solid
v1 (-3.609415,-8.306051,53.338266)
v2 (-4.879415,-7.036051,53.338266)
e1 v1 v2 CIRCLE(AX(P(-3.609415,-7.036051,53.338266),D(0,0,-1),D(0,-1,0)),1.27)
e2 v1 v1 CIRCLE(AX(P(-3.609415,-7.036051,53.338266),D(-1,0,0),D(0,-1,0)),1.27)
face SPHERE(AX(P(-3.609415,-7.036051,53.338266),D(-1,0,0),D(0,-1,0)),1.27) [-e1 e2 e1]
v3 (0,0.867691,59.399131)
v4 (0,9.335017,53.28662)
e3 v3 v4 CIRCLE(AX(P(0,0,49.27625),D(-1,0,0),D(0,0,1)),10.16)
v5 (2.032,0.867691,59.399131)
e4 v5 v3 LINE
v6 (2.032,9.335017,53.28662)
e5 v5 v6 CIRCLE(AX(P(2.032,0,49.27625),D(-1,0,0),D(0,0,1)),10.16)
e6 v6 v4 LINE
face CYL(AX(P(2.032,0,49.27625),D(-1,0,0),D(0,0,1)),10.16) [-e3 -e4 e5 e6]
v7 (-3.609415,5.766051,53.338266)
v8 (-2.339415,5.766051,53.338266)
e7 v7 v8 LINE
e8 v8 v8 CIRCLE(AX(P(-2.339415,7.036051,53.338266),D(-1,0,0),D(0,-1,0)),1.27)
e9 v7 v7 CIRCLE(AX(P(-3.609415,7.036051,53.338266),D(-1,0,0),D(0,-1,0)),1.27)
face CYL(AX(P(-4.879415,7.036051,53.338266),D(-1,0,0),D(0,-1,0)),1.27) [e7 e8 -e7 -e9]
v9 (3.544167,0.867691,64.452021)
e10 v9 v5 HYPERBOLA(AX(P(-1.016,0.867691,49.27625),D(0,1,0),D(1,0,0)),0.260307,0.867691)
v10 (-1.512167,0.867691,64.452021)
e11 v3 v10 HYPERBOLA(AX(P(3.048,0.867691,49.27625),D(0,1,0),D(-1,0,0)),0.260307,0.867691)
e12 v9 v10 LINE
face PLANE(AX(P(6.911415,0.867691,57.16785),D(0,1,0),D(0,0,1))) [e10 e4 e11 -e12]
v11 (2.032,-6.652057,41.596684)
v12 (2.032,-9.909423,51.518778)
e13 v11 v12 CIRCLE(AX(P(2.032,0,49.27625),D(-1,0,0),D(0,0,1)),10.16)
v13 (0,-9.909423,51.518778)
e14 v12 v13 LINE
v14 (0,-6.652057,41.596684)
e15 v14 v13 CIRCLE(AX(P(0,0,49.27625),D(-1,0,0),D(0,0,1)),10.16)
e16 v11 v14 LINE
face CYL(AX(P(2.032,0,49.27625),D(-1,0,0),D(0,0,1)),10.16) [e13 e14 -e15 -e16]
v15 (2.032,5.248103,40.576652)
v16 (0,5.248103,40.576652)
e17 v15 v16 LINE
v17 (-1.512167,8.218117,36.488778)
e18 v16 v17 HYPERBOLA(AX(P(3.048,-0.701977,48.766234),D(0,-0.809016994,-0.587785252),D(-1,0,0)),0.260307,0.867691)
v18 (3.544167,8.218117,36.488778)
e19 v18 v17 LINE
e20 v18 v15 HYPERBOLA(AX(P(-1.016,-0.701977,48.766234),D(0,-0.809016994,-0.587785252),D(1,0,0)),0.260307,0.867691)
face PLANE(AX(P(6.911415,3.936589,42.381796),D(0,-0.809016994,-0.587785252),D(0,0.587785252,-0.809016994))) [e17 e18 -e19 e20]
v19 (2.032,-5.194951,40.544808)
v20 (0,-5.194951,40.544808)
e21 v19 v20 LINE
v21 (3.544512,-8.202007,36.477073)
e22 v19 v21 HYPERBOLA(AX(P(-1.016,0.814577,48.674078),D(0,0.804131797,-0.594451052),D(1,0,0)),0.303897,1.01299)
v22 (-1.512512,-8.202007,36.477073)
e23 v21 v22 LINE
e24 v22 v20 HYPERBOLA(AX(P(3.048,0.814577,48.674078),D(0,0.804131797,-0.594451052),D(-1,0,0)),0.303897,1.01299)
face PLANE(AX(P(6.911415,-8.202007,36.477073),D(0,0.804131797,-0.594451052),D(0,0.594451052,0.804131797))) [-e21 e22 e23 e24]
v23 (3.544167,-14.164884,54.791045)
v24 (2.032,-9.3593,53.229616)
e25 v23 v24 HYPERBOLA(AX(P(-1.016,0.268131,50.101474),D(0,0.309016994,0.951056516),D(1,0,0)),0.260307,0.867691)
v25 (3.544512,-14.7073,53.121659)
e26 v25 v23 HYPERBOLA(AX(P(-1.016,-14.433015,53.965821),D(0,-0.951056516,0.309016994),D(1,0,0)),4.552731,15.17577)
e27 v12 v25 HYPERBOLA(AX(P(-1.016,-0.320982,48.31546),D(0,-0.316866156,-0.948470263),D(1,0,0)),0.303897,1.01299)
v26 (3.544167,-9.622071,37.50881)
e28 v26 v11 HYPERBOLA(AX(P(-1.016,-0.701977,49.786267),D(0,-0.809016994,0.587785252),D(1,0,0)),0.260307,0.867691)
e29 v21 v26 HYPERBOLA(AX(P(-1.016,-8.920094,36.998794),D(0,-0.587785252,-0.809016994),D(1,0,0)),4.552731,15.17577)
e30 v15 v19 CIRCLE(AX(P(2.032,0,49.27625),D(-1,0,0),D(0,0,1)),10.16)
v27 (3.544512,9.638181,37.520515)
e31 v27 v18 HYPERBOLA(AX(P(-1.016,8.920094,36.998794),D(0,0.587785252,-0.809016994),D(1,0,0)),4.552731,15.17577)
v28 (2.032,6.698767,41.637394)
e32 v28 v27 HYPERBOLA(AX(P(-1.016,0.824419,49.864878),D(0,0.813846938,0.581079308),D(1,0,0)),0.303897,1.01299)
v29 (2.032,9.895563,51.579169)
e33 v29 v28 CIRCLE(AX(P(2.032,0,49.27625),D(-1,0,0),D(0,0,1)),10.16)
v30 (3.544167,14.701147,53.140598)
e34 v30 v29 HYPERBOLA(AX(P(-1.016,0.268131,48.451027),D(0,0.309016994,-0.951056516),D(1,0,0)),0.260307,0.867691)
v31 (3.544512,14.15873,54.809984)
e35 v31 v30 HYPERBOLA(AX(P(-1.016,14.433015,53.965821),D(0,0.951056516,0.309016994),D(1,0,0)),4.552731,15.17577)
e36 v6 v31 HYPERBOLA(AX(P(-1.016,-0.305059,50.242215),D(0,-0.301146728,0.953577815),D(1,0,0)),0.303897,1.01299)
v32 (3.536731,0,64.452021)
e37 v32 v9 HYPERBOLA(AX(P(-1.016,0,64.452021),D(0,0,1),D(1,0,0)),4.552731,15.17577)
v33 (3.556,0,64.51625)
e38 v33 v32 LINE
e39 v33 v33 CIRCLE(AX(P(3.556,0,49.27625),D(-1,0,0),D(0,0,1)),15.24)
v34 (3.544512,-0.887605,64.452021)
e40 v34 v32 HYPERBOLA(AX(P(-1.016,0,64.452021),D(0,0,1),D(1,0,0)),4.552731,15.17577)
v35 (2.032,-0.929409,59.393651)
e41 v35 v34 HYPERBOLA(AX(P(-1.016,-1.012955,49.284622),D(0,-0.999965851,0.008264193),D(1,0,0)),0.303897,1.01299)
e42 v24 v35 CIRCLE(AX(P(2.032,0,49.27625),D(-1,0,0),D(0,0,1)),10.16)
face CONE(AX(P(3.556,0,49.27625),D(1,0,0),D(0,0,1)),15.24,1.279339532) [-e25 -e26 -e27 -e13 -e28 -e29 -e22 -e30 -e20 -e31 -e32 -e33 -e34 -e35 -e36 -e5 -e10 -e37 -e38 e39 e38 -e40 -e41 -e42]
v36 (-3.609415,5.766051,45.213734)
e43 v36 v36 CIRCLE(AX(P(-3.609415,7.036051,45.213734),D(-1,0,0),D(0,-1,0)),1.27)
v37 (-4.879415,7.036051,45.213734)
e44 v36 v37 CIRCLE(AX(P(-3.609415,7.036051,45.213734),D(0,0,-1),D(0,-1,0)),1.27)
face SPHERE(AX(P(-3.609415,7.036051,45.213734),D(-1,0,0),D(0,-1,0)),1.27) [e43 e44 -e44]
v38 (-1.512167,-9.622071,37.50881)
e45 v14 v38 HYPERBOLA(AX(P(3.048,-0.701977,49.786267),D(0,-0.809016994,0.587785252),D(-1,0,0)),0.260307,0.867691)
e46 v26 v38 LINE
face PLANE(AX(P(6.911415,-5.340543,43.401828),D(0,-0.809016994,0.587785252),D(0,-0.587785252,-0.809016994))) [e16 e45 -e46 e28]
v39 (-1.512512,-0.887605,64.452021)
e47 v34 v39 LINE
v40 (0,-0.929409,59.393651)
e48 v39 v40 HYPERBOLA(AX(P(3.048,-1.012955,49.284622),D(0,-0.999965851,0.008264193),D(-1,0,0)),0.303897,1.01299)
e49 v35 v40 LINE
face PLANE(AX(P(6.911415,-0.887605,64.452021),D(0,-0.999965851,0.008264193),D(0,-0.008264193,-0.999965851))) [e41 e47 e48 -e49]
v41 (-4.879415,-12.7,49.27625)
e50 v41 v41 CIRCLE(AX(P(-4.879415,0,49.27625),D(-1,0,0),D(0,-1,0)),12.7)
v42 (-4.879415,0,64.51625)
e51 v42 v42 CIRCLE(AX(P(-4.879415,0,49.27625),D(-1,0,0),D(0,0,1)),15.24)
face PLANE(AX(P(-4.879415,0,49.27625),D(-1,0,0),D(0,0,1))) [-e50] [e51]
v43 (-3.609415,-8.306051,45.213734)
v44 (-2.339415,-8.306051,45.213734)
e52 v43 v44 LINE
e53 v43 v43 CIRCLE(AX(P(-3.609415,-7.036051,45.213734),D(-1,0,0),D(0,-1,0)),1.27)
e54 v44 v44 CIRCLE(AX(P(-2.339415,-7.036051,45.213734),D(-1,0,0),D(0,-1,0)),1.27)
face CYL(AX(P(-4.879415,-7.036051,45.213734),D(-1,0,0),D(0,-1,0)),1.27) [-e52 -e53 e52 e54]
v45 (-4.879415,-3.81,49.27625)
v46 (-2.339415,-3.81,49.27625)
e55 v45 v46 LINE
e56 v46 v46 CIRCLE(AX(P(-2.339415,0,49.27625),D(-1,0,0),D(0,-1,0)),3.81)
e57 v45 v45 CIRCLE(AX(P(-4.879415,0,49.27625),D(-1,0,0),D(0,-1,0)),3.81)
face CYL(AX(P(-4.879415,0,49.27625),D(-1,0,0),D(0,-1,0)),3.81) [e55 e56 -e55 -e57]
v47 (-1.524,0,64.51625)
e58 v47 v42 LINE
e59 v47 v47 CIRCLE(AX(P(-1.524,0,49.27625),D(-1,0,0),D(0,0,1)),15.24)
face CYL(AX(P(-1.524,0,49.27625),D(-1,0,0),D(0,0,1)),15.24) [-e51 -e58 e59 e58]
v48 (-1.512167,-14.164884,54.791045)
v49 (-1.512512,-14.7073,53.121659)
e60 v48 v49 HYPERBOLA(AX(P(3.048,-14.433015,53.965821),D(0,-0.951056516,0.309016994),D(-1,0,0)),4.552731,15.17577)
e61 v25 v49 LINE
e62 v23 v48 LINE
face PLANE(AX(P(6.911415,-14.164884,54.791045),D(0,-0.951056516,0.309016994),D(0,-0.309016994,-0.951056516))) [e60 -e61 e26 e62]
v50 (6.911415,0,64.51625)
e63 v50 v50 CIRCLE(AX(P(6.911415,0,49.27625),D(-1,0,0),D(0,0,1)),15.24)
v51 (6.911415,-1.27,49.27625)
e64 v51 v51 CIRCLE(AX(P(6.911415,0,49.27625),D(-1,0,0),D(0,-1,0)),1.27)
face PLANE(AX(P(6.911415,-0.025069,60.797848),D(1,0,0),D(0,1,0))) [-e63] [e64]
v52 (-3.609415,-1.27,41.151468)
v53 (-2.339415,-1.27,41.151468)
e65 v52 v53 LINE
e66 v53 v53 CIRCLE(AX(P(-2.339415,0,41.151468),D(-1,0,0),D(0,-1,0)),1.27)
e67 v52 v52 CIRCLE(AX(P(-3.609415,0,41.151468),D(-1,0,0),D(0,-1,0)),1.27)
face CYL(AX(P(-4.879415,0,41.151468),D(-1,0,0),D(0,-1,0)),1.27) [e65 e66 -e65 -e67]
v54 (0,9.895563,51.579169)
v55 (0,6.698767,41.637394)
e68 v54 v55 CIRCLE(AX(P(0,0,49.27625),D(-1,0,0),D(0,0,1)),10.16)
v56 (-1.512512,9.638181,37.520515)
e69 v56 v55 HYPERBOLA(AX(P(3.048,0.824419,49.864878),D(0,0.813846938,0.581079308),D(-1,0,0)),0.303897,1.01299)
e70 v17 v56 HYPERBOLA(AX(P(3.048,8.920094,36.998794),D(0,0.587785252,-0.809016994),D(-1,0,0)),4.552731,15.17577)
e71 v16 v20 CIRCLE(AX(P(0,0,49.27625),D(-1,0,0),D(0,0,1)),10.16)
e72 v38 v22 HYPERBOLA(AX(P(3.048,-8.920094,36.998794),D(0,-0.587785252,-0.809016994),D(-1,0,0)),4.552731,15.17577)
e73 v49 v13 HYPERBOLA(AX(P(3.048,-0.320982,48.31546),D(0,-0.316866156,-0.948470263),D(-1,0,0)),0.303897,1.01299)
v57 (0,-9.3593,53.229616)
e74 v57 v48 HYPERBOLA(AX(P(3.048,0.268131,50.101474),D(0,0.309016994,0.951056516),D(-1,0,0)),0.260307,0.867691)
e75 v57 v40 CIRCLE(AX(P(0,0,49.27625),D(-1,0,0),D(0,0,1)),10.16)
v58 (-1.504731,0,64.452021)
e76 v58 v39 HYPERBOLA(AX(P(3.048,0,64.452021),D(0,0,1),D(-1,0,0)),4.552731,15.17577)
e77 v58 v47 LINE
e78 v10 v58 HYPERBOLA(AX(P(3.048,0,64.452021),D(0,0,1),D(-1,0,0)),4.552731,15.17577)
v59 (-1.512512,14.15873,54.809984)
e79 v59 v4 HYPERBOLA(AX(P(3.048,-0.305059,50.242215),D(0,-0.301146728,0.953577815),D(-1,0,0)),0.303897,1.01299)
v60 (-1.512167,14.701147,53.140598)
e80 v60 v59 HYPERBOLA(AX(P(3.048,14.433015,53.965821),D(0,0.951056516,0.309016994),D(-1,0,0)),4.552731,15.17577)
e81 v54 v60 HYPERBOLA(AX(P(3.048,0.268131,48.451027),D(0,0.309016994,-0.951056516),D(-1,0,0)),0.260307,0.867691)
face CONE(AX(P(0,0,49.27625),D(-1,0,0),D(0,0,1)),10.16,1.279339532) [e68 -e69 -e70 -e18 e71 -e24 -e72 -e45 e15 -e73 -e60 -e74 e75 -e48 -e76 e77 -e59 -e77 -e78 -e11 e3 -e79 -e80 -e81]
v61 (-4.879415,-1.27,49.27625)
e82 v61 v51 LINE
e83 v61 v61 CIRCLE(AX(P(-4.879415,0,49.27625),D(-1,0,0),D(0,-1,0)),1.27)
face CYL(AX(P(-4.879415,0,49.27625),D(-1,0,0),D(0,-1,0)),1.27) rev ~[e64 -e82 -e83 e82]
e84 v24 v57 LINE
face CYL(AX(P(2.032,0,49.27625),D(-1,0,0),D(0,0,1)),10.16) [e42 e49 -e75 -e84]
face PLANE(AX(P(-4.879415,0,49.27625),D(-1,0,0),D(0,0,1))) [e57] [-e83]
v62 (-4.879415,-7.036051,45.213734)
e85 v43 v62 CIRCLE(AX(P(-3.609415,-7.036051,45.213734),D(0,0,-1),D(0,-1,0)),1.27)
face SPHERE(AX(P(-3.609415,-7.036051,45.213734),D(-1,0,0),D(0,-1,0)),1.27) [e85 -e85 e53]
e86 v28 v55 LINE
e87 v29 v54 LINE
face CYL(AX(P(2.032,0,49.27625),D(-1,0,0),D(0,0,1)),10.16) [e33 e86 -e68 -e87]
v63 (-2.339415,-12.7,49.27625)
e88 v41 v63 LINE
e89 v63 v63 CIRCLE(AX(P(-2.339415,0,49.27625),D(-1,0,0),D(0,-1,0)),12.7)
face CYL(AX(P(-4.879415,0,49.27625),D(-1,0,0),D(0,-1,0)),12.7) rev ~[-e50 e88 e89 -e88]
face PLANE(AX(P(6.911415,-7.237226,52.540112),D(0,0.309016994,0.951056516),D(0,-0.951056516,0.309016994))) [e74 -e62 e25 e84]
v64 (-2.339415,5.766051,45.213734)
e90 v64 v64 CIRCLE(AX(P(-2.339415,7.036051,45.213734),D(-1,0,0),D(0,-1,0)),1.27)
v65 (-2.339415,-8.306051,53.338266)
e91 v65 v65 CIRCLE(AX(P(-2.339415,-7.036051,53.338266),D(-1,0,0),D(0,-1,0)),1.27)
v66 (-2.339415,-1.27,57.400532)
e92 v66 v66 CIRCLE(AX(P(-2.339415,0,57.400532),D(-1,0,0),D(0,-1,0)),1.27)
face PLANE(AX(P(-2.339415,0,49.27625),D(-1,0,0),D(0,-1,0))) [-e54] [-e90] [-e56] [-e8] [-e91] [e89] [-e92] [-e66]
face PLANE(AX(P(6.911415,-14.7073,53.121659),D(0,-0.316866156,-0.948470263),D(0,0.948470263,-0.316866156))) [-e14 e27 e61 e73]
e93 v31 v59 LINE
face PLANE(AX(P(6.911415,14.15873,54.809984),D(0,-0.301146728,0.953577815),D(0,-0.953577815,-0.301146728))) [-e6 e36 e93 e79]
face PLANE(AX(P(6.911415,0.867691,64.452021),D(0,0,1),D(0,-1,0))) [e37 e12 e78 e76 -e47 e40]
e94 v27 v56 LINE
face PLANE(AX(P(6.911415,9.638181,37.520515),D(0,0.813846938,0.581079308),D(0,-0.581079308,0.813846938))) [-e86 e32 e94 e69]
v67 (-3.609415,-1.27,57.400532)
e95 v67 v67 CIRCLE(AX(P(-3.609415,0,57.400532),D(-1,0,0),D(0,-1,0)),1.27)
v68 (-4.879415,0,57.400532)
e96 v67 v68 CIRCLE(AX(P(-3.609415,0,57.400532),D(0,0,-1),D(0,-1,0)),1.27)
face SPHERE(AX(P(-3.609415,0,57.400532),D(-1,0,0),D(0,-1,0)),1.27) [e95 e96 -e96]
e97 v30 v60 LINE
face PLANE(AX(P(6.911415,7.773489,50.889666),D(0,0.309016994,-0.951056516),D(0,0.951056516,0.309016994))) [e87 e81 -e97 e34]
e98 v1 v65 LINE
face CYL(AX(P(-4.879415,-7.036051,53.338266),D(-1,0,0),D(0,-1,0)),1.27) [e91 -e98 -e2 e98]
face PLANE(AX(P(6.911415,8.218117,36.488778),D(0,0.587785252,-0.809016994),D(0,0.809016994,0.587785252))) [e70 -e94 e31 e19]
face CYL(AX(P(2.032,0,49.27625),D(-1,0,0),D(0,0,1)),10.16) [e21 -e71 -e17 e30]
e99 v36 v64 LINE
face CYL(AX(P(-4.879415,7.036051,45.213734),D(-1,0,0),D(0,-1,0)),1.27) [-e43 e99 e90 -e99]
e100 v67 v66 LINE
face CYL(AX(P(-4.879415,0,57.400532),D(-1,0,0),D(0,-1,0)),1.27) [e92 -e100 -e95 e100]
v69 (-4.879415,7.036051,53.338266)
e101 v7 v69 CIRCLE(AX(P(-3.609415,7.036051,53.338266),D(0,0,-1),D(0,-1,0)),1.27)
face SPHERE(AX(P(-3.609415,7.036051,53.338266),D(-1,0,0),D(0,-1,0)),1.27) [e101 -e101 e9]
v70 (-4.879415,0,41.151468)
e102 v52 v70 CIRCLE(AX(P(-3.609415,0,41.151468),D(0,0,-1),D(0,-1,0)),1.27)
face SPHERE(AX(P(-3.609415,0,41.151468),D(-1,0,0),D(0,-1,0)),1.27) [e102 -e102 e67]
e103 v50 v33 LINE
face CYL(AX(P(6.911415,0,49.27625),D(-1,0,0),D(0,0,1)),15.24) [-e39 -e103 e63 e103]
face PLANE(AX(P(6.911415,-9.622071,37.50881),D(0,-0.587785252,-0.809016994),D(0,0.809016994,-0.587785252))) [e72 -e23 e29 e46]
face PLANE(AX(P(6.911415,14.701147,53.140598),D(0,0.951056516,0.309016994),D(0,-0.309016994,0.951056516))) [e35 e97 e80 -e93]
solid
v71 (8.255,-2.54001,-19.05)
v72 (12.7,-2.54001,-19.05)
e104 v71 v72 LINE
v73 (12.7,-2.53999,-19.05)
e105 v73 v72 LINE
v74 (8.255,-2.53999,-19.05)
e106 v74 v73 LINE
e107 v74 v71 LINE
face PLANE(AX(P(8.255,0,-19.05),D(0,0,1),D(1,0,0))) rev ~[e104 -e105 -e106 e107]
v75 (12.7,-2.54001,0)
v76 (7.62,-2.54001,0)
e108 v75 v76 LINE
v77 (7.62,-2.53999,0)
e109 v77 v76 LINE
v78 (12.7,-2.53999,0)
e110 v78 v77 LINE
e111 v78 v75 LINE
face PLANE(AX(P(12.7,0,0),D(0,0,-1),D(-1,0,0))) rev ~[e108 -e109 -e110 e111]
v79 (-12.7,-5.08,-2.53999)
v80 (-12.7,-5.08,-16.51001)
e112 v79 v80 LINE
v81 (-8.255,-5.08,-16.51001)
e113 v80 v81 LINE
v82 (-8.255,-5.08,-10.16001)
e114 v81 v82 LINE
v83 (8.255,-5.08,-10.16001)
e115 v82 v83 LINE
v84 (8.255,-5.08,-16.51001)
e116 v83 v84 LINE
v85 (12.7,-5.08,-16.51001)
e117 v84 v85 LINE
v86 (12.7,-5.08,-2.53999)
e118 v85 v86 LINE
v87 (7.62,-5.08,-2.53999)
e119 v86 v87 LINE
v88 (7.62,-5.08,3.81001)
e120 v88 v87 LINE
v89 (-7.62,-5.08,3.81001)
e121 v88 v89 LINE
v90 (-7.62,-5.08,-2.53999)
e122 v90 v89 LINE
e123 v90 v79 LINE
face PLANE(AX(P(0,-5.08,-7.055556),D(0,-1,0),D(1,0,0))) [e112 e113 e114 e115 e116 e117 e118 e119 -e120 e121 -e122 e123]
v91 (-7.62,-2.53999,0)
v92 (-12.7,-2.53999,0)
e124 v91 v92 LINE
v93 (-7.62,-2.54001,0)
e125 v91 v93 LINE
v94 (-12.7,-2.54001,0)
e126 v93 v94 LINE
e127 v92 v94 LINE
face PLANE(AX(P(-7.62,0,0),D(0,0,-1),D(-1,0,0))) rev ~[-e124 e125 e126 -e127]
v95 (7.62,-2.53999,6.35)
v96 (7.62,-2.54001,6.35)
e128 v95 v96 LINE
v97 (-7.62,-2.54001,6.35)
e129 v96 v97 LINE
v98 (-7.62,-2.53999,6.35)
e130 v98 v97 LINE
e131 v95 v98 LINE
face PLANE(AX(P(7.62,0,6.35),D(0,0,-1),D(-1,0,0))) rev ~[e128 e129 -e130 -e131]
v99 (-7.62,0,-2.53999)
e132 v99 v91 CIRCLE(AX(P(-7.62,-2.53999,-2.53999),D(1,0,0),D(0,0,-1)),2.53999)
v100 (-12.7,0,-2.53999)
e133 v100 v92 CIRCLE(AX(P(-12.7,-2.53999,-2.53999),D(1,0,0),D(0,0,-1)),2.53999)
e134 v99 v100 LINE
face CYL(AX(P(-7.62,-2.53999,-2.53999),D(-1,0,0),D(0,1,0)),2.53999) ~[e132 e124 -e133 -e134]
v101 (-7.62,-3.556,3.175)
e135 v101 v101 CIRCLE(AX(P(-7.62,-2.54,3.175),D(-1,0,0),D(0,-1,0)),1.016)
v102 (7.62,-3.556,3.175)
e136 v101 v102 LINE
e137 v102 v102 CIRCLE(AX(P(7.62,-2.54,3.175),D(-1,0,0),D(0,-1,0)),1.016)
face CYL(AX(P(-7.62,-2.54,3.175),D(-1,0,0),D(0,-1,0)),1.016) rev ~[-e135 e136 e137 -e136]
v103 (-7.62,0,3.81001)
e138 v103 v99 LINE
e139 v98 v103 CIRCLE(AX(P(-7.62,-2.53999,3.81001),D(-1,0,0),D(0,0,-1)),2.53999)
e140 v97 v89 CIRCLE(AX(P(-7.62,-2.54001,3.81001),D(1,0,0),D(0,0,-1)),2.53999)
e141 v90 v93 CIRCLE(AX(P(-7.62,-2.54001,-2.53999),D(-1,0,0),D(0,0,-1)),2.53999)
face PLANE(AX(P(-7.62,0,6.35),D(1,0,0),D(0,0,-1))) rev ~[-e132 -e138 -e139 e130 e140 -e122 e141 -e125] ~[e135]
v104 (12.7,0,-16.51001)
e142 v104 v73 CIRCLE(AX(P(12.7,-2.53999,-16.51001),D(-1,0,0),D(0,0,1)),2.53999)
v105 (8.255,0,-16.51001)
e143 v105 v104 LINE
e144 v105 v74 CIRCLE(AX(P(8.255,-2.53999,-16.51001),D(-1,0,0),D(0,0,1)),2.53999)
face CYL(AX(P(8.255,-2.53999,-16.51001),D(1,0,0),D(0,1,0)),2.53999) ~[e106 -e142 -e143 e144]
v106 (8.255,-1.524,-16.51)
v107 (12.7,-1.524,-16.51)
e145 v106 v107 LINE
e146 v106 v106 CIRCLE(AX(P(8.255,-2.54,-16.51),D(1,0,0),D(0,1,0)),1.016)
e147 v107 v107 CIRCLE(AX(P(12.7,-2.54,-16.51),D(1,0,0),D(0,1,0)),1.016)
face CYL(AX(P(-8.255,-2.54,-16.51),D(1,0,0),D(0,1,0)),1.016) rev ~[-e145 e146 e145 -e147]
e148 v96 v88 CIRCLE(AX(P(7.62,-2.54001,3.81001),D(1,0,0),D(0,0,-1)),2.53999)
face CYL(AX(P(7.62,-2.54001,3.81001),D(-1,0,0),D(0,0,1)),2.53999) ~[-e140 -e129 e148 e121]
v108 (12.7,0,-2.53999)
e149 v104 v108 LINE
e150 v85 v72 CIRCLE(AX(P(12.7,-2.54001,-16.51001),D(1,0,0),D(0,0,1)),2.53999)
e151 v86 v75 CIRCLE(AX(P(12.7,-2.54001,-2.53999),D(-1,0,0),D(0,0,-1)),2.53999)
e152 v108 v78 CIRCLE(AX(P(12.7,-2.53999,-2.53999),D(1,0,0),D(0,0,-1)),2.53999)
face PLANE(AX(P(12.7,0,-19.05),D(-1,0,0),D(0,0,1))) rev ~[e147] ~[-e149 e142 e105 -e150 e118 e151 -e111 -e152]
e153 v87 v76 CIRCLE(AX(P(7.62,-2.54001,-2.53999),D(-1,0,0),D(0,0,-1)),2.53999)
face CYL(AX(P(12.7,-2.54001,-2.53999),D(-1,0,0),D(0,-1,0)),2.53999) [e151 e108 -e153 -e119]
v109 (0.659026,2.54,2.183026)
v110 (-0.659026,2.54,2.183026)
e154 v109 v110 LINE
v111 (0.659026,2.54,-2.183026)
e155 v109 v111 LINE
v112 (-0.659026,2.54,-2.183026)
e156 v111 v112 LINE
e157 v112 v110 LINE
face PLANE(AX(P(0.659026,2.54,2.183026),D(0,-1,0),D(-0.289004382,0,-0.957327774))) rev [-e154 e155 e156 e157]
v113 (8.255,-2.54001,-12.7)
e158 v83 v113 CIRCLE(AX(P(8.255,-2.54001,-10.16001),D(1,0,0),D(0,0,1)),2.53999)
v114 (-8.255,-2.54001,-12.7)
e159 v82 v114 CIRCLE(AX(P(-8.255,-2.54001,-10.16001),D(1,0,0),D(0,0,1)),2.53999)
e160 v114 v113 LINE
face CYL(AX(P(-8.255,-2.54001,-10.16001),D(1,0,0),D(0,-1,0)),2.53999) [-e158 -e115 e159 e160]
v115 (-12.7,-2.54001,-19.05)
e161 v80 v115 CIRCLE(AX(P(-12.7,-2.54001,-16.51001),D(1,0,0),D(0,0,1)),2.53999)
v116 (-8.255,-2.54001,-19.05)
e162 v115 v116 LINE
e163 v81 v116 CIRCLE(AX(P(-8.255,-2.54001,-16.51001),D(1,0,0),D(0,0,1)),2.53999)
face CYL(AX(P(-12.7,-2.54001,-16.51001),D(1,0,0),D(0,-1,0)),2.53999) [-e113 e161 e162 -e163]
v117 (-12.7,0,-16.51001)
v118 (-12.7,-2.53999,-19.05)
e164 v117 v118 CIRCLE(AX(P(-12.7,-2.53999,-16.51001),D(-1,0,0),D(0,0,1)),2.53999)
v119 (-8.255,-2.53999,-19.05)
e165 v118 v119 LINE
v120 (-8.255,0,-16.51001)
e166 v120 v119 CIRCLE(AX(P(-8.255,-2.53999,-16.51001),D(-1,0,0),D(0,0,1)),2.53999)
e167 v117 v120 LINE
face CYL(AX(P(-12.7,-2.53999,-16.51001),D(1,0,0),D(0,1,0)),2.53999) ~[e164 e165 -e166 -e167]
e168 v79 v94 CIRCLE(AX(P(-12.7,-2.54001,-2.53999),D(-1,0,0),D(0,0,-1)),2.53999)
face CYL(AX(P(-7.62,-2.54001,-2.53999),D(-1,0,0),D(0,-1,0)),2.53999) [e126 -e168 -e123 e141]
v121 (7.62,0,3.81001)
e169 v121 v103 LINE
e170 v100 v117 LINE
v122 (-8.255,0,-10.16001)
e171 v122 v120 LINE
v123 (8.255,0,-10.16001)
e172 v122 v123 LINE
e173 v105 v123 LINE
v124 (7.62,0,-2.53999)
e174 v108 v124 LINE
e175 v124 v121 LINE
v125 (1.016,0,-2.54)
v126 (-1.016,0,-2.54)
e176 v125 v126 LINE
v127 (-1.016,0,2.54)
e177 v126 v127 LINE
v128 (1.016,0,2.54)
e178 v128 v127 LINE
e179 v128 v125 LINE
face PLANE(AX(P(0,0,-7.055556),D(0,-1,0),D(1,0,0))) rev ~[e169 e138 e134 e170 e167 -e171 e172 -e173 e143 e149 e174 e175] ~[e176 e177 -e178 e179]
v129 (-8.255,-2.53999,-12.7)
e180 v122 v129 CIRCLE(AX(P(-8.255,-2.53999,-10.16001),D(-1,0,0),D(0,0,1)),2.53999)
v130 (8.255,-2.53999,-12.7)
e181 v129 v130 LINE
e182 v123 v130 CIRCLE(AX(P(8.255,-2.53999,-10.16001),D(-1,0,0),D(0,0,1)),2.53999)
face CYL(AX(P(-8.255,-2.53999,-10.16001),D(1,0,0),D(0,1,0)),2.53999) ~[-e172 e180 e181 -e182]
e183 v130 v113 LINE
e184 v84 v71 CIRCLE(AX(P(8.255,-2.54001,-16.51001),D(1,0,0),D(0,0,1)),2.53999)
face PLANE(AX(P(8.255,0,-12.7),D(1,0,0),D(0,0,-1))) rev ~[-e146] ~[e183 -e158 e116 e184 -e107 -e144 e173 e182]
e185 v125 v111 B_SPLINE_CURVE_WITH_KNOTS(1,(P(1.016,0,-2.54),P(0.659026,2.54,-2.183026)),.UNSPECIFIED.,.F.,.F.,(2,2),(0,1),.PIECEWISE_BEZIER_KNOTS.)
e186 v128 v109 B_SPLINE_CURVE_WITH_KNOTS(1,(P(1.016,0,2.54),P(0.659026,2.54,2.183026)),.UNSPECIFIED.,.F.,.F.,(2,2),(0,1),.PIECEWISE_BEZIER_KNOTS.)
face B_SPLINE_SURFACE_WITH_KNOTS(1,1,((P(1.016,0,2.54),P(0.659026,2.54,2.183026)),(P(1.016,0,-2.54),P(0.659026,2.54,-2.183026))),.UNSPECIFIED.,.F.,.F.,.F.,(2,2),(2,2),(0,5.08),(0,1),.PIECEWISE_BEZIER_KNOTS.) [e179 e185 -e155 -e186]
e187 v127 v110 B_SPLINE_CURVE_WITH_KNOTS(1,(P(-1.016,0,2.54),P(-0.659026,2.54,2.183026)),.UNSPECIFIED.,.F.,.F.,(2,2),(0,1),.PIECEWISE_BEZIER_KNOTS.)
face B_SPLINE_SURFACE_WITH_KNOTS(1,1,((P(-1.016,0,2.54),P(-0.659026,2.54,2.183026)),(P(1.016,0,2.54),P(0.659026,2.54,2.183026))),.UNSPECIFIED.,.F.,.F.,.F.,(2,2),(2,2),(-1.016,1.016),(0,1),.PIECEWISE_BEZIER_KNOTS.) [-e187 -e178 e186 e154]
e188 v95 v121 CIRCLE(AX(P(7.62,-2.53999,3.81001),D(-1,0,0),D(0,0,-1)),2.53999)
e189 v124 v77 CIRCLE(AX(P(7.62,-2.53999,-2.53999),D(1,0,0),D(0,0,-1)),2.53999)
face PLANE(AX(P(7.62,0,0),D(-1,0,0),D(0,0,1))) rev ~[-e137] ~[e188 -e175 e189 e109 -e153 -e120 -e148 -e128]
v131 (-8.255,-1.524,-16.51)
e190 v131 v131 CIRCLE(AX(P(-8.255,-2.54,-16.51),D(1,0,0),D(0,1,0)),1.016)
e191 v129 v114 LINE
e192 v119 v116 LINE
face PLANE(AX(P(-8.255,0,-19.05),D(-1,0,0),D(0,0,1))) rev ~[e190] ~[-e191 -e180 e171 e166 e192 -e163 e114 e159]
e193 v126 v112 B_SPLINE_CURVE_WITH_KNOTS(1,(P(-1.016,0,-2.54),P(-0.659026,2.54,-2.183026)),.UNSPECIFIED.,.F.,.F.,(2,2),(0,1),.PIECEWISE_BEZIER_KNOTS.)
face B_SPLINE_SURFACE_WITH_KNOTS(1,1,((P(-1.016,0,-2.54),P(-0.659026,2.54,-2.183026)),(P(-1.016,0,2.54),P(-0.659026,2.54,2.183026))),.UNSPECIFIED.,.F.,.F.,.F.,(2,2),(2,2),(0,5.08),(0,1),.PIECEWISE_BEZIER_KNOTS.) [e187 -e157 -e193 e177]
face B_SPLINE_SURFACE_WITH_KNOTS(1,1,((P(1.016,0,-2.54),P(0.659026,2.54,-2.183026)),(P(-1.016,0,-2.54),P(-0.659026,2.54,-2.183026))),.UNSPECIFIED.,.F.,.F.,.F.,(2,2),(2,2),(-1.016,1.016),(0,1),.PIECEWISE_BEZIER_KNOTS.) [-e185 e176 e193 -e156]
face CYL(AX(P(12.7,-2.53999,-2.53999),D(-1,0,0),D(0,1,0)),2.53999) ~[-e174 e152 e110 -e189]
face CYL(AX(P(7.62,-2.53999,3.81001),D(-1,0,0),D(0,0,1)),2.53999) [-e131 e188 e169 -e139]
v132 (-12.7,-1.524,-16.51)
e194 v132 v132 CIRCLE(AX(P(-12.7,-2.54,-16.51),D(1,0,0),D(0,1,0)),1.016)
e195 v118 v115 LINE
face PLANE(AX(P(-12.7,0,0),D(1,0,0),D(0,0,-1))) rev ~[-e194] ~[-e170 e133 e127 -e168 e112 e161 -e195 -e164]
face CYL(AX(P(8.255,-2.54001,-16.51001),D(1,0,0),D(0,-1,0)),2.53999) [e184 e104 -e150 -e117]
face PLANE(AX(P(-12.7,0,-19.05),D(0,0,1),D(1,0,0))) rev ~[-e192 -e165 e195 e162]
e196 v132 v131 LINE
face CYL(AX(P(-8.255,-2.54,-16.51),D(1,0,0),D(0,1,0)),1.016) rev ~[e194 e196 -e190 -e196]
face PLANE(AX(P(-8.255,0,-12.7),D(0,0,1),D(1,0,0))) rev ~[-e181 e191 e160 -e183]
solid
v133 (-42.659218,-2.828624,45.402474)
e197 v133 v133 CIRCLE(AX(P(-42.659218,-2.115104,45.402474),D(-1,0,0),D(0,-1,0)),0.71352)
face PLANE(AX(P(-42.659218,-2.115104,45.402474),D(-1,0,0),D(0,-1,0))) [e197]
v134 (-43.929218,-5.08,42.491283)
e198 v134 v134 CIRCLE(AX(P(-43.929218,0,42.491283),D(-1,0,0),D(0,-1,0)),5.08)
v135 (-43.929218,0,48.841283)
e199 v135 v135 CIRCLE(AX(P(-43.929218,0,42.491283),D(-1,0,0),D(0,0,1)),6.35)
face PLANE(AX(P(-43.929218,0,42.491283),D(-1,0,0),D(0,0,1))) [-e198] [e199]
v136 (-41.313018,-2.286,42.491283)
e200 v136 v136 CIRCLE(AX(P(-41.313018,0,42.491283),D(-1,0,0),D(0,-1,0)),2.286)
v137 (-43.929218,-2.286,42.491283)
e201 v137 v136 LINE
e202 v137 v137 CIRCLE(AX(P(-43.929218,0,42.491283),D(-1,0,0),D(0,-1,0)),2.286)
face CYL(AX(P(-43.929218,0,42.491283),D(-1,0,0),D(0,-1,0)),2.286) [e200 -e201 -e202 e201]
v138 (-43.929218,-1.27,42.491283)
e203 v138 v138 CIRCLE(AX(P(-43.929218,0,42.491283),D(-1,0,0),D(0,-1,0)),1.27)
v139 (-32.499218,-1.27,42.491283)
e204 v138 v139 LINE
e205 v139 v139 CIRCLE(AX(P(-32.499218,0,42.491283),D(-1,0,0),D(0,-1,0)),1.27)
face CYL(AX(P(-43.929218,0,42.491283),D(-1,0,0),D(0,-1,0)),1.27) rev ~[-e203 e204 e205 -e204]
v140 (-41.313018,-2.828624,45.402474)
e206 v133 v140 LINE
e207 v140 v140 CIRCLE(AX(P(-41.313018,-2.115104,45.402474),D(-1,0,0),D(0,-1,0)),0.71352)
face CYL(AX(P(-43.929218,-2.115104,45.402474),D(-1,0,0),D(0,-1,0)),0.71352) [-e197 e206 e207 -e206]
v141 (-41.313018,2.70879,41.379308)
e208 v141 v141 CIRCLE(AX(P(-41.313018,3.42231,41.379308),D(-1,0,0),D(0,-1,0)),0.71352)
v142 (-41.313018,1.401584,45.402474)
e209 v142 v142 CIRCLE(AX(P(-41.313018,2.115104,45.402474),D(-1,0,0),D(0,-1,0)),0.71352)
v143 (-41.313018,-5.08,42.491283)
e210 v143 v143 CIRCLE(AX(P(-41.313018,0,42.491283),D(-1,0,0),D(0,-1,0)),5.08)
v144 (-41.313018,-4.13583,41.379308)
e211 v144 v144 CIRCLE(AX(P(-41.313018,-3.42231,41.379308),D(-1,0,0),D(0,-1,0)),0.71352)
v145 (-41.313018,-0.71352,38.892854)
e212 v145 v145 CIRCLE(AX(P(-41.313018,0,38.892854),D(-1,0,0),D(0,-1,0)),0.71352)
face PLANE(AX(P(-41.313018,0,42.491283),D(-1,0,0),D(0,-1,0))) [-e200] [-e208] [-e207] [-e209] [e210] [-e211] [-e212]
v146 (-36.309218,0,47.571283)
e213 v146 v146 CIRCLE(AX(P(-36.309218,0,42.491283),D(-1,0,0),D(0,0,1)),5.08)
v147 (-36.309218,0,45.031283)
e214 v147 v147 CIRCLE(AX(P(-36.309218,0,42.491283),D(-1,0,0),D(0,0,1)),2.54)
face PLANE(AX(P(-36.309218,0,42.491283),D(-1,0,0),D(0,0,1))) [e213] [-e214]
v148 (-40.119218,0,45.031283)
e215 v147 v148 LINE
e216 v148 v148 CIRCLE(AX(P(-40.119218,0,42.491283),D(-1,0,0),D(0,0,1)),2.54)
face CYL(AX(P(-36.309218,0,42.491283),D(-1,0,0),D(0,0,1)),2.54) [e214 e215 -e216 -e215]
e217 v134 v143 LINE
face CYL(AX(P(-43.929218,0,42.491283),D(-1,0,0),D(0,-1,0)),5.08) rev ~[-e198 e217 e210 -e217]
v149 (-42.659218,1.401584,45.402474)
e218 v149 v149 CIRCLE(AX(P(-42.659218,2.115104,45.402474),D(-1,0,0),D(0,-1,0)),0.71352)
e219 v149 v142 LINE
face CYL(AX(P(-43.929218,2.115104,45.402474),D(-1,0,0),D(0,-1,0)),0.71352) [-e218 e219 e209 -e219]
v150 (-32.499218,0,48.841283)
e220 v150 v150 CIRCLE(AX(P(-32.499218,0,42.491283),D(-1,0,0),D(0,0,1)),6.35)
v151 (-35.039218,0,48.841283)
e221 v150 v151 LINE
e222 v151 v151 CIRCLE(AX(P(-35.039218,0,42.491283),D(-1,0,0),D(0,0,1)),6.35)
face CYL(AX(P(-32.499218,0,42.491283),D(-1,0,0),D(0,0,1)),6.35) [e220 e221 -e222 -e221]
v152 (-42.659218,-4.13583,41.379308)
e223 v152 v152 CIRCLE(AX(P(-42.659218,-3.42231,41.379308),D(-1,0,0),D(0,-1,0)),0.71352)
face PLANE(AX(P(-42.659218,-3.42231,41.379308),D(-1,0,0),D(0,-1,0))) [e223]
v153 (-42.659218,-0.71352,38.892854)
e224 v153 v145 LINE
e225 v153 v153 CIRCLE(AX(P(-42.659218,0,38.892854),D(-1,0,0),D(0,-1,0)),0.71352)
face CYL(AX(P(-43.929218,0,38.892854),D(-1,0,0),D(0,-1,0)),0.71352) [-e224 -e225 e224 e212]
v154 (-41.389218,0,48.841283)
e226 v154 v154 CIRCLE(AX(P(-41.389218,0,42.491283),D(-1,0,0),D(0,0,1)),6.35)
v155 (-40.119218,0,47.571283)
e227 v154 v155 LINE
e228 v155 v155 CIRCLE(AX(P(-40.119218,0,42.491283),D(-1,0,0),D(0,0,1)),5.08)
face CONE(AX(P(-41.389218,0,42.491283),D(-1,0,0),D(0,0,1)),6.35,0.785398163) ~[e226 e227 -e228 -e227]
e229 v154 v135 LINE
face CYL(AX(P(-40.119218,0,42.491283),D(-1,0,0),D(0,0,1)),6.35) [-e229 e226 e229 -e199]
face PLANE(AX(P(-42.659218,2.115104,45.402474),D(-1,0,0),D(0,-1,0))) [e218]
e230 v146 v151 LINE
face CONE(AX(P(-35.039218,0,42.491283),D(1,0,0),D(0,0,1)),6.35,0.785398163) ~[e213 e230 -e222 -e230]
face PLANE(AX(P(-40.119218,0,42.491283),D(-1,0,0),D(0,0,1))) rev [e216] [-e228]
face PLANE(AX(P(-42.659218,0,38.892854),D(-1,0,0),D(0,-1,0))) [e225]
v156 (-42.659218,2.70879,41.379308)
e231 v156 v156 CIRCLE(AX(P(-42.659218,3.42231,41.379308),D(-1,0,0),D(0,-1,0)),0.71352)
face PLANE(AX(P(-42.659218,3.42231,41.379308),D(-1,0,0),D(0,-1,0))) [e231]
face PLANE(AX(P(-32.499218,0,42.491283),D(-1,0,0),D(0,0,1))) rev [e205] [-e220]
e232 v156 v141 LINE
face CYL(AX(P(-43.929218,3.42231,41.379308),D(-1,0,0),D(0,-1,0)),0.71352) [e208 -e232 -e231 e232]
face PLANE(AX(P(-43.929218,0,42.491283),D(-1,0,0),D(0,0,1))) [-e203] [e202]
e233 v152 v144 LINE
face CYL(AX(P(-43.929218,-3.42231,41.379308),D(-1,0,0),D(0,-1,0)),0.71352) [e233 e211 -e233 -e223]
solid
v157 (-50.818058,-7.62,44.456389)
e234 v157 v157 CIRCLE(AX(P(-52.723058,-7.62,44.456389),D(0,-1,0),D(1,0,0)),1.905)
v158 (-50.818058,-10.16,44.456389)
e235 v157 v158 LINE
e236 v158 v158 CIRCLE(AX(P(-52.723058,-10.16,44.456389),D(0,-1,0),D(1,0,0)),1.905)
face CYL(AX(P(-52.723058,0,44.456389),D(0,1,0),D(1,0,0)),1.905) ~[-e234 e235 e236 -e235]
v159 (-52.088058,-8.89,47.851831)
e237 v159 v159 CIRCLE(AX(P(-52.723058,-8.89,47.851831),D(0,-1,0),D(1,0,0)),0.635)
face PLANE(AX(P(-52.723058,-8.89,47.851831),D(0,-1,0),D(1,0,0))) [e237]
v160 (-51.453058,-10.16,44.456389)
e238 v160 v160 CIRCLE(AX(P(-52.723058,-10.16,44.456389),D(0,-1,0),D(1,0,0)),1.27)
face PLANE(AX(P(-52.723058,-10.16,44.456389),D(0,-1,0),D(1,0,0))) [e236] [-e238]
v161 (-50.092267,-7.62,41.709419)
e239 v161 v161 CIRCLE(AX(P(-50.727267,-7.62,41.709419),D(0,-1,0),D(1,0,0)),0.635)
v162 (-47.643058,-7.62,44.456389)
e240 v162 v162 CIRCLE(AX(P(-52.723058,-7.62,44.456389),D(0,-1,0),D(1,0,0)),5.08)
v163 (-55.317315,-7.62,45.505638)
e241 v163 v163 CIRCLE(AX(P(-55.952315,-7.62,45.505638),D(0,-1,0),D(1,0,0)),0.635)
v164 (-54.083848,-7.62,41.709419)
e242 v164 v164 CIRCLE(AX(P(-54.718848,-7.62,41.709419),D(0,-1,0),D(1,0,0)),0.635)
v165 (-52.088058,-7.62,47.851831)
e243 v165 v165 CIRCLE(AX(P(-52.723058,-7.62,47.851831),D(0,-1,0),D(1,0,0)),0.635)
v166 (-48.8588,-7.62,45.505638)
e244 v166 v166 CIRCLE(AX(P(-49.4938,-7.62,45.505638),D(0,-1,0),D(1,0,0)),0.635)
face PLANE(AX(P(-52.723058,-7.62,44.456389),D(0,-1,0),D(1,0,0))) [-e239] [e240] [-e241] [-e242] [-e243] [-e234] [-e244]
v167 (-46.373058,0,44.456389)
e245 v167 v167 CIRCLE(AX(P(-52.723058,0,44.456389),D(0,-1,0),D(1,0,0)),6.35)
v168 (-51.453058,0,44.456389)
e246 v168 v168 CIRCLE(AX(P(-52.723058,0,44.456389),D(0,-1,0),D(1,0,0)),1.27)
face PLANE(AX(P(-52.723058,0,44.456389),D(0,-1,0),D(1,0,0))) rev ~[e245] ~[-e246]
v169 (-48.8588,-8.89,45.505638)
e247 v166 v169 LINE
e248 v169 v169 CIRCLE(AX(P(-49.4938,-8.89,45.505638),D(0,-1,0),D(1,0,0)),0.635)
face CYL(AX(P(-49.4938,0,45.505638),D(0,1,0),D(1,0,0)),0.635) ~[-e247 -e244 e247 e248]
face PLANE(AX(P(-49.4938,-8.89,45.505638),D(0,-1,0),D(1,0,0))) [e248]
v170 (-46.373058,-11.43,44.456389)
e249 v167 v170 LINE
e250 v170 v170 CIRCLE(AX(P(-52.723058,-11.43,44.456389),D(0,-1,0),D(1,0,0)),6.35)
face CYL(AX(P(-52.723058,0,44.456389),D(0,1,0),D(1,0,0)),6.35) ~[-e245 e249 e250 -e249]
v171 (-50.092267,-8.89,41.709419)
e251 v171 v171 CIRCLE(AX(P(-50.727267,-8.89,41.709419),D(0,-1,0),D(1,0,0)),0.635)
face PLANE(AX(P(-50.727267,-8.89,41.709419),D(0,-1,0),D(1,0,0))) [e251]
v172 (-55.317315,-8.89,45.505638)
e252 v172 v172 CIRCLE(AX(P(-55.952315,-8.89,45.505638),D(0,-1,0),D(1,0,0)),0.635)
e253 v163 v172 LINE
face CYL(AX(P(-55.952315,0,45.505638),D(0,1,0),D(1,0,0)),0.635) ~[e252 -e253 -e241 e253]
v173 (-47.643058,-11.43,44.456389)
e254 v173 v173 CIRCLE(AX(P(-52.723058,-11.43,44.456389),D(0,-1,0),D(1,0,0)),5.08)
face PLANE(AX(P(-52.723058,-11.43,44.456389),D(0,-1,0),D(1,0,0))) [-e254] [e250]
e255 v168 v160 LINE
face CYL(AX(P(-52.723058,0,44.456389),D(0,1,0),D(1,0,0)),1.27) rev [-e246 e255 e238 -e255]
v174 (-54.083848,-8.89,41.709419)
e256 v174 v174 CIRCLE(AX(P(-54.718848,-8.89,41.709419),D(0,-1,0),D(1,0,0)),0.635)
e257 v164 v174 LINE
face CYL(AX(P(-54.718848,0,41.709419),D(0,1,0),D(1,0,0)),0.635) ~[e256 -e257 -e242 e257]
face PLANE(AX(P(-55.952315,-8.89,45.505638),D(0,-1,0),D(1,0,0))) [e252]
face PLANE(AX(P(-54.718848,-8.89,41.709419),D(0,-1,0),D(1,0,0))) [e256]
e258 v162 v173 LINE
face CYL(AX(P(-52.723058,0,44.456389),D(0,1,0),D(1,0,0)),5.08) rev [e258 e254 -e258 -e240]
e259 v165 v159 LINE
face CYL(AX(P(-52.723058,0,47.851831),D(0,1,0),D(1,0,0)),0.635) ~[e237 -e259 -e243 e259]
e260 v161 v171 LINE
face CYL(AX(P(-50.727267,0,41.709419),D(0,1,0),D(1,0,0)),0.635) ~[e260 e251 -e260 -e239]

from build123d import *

# Parameters (mm, degrees)
F1_DEPTH  = 5.08
F2_R      = 1.016
F3_DEPTH  = 25.4
F4_R      = 2.53999
F5_R      = 1.016
F6_DEPTH  = 25.4
F8_W      = 2.032
F8_H      = 3.6169881774
F8_H_2    = 1.4630118226
F9_DEPTH  = 2.54
F9_TAPER  = 8
F12_R     = 12.7
F12_R_2   = 3.81
F13_DEPTH = 2.54
F12_R_3   = 1.27
F14_DEPTH = 25.4
F15_R     = 1.27
F16_DEPTH = 2.54
F17_R     = 1.27
F19_DEPTH = 8.89
F20_R     = 6.35
F20_R_2   = 5.08
F21_DEPTH = 11.43
F20_R_3   = 0.635
F20_R_4   = 1.905
F22_DEPTH = 7.62
F23_DEPTH = 8.89
F20_R_5   = 1.27
F24_DEPTH = 10.16
F27_R     = 5.08
F27_R_2   = 0.7135199612
F27_R_3   = 2.286
F28_DEPTH = 2.6162
F27_R_4   = 1.27
F29_DEPTH = 25.4
F30_DEPTH = 1.27
F31_SIZE  = 1.27


# Not quite as in the source:
# - a fillet or chamfer is up to 0.001 mm smaller than in the source, because OpenCascade refuses the exact size


with BuildPart() as f1:
    # F0 (on Front) → F1 (new body)
    with BuildSketch(Plane.XZ):
        Polygon((7.62, 6.35), (0, 6.35), (-7.62, 6.35), (-7.62, 0), (-12.7, 0), (-12.7, -19.05), (-8.255, -19.05), (-8.255, -12.7), (0, -12.7), (8.255, -12.7), (8.255, -19.05), (12.7, -19.05), (12.7, 0), (7.62, 0), align=None)
    extrude(amount=F1_DEPTH)

    # F2 (on face) → F3 (cut)
    with BuildSketch(Plane(origin=(-7.62, 0, 0), x_dir=(0, -1, 0), z_dir=(-1, 0, 0))):
        with Locations((2.54, 3.175)):
            Circle(F2_R)
    extrude(amount=-F3_DEPTH, mode=Mode.SUBTRACT)

    # F4 (radius 2.54 in the source; OpenCascade refuses exactly that, so slightly less here)
    f4_edges = [f1.edges().sort_by_distance(p)[0] for p in [
        (0, -5.08, 6.35),
        (0, 0, 6.35),
        (-10.16, -5.08, 0),
        (-10.16, 0, 0),
        (10.16, -5.08, 0),
        (10.16, 0, 0),
        (10.4775, -5.08, -19.05),
        (10.4775, 0, -19.05),
        (-10.4775, 0, -19.05),
        (-10.4775, -5.08, -19.05),
        (0, -5.08, -12.7),
        (0, 0, -12.7),
    ]]
    fillet(f4_edges, radius=F4_R)

    # F5 (on face) → F6 (cut, symmetric)
    with BuildSketch(Plane.YZ.offset(-8.255)):
        with Locations((-2.54, -16.51)):
            Circle(F5_R)
    extrude(amount=F6_DEPTH, both=True, mode=Mode.SUBTRACT)

    # F8 (on face) → F9 (join)
    with BuildSketch(Plane(origin=(0, 0, 0), x_dir=(-1, 0, 0), z_dir=(0, 1, 0))):
        with Locations((0, 0.7315059113)):
            Rectangle(F8_W, F8_H)
        with Locations((0, -1.8084940887)):
            Rectangle(F8_W, F8_H_2)
    extrude(amount=F9_DEPTH, taper=F9_TAPER)


with BuildPart() as f11:
    # F10 (on Front) → F11 (revolve)
    with BuildSketch(Plane.XZ):
        Polygon((-4.8794146568, 64.516250478), (-4.8794146568, 49.276250478), (6.9114146568, 49.276250478), (6.9114146568, 64.516250478), (3.556, 64.516250478), (2.032, 59.436250478), (0, 59.436250478), (-1.524, 64.516250478), align=None)
    revolve(axis=Axis((1.016, 0, 49.276250478), (-1, 0, 0)))

    # F12 (on face) → F13 (cut)
    with BuildSketch(Plane(origin=(-4.8794146568, 0, 0), x_dir=(0, -1, 0), z_dir=(-1, 0, 0))):
        with Locations((0, 49.276250478)):
            Circle(F12_R)
        with Locations((0, 49.276250478)):
            Circle(F12_R_2, mode=Mode.SUBTRACT)
    extrude(amount=-F13_DEPTH, mode=Mode.SUBTRACT)

    # F12 (on face) → F14 (cut)
    with BuildSketch(Plane(origin=(-4.8794146568, 0, 0), x_dir=(0, -1, 0), z_dir=(-1, 0, 0))):
        with Locations((0, 49.276250478)):
            Circle(F12_R_3)
    extrude(amount=-F14_DEPTH, mode=Mode.SUBTRACT)

    # F15 (on face) → F16 (join)
    with BuildSketch(Plane(origin=(-4.8794146568, 0, 0), x_dir=(0, -1, 0), z_dir=(-1, 0, 0))):
        with Locations((-7.0360511637, 53.3382660334)):
            Circle(F15_R)
        with Locations((0, 57.4005320668)):
            Circle(F15_R)
        with Locations((7.0360511637, 53.3382660334)):
            Circle(F15_R)
        with Locations((-7.0360511637, 45.2137339666)):
            Circle(F15_R)
        with Locations((0, 41.1514679332)):
            Circle(F15_R)
        with Locations((7.0360511637, 45.2137339666)):
            Circle(F15_R)
    extrude(amount=-F16_DEPTH)

    # F17
    f17_edges = [f11.edges().sort_by_distance(p)[0] for p in [
        (-4.879415, 8.306051, 53.338266),
        (-4.879415, 8.306051, 45.213734),
        (-4.879415, 1.27, 41.151468),
        (-4.879415, -5.766051, 45.213734),
        (-4.879415, -5.766051, 53.338266),
        (-4.879415, 1.27, 57.400532),
    ]]
    fillet(f17_edges, radius=F17_R)

    # F18 (on face) → F19 (join)
    with BuildSketch(Plane.YZ.offset(6.9114146568)):
        Polygon((0.8676911239, 64.4520207786), (-0.887604639, 64.4520207786), (-0.9478044813, 57.1678504348), (0.8676911239, 57.1678504348), align=None)
        Polygon((-14.164883931, 54.7910447011), (-14.7073001519, 53.1216592278), (-7.7982452549, 50.8134733494), (-7.2372262597, 52.540112275), align=None)
        Polygon((-9.6220708399, 37.5088104483), (-8.2020067376, 36.4770734854), (-3.8717761389, 42.3347065041), (-5.3405429366, 43.4018280464), align=None)
        Polygon((8.2181171098, 36.488778356), (9.6381812121, 37.5205153188), (5.4053560043, 43.4489174963), (3.9365892065, 42.3817959541), align=None)
        Polygon((14.7011465373, 53.1405981062), (14.1587303164, 54.8099835795), (7.2124698708, 52.6163046055), (7.773488866, 50.88966568), align=None)
    extrude(amount=-F19_DEPTH)


with BuildPart() as f21:
    # F20 (on Front) → F21 (new body)
    with BuildSketch(Plane.XZ):
        with Locations((-52.7230575681, 44.4563888013)):
            Circle(F20_R)
        with Locations((-52.7230575681, 44.4563888013)):
            Circle(F20_R_2, mode=Mode.SUBTRACT)
    extrude(amount=F21_DEPTH)

    # F20 (on Front) → F22 (join)
    with BuildSketch(Plane.XZ):
        with Locations((-52.7230575681, 44.4563888013)):
            Circle(F20_R_2)
        with Locations((-54.7188482534, 41.709418585)):
            Circle(F20_R_3, mode=Mode.SUBTRACT)
        with Locations((-50.7272668827, 41.709418585)):
            Circle(F20_R_3, mode=Mode.SUBTRACT)
        with Locations((-55.9523147314, 45.5056380579)):
            Circle(F20_R_3, mode=Mode.SUBTRACT)
        with Locations((-52.7230575681, 44.4563888013)):
            Circle(F20_R_4, mode=Mode.SUBTRACT)
        with Locations((-49.4938004048, 45.5056380579)):
            Circle(F20_R_3, mode=Mode.SUBTRACT)
        with Locations((-52.7230575681, 47.8518307209)):
            Circle(F20_R_3, mode=Mode.SUBTRACT)
    extrude(amount=F22_DEPTH)

    # F20 (on Front) → F23 (join)
    with BuildSketch(Plane.XZ):
        with Locations((-52.7230575681, 47.8518307209)):
            Circle(F20_R_3)
        with Locations((-55.9523147314, 45.5056380579)):
            Circle(F20_R_3)
        with Locations((-54.7188482534, 41.709418585)):
            Circle(F20_R_3)
        with Locations((-50.7272668827, 41.709418585)):
            Circle(F20_R_3)
        with Locations((-49.4938004048, 45.5056380579)):
            Circle(F20_R_3)
    extrude(amount=F23_DEPTH)

    # F20 (on Front) → F24 (join)
    with BuildSketch(Plane.XZ):
        with Locations((-52.7230575681, 44.4563888013)):
            Circle(F20_R_4)
        with Locations((-52.7230575681, 44.4563888013)):
            Circle(F20_R_5, mode=Mode.SUBTRACT)
    extrude(amount=F24_DEPTH)


with BuildPart() as f26:
    # F25 (on Front) → F26 (revolve)
    with BuildSketch(Plane.XZ):
        Polygon((-43.9292184118, 48.8412834392), (-43.9292184118, 43.7269604878), (-43.9292184118, 42.4912834392), (-32.4992184118, 42.4912834392), (-32.4992184118, 48.8412834392), (-36.3092184118, 48.8412834392), (-36.3092184118, 45.0312834392), (-40.1192184118, 45.0312834392), (-40.1192184118, 48.8412834392), align=None)
    revolve(axis=Axis((-38.2142184118, 0, 42.4912834392), (-1, 0, 0)))

    # F27 (on face) → F28 (cut)
    with BuildSketch(Plane(origin=(-43.9292184118, 0, 0), x_dir=(0, -1, 0), z_dir=(-1, 0, 0))):
        with Locations((0, 42.4912834392)):
            Circle(F27_R)
        with Locations((-3.4223097618, 41.379307591)):
            Circle(F27_R_2, mode=Mode.SUBTRACT)
        with Locations((0, 38.8928540051)):
            Circle(F27_R_2, mode=Mode.SUBTRACT)
        with Locations((3.4223097618, 41.379307591)):
            Circle(F27_R_2, mode=Mode.SUBTRACT)
        with Locations((-2.1151037528, 45.4024740045)):
            Circle(F27_R_2, mode=Mode.SUBTRACT)
        with Locations((0, 42.4912834392)):
            Circle(F27_R_3, mode=Mode.SUBTRACT)
        with Locations((2.1151037528, 45.4024740045)):
            Circle(F27_R_2, mode=Mode.SUBTRACT)
    extrude(amount=-F28_DEPTH, mode=Mode.SUBTRACT)

    # F27 (on face) → F29 (cut)
    with BuildSketch(Plane(origin=(-43.9292184118, 0, 0), x_dir=(0, -1, 0), z_dir=(-1, 0, 0))):
        with Locations((0, 42.4912834392)):
            Circle(F27_R_4)
    extrude(amount=-F29_DEPTH, mode=Mode.SUBTRACT)

    # F27 (on face) → F30 (cut)
    with BuildSketch(Plane(origin=(-43.9292184118, 0, 0), x_dir=(0, -1, 0), z_dir=(-1, 0, 0))):
        with Locations((-2.1151037528, 45.4024740045)):
            Circle(F27_R_2)
        with Locations((-3.4223097618, 41.379307591)):
            Circle(F27_R_2)
        with Locations((0, 38.8928540051)):
            Circle(F27_R_2)
        with Locations((3.4223097618, 41.379307591)):
            Circle(F27_R_2)
        with Locations((2.1151037528, 45.4024740045)):
            Circle(F27_R_2)
    extrude(amount=-F30_DEPTH, mode=Mode.SUBTRACT)

    # F31
    f31_edges = [f26.edges().sort_by_distance(p)[0] for p in [
        (-40.119218, 0, 36.141283),
        (-36.309218, 0, 36.141283),
    ]]
    chamfer(f31_edges, length=F31_SIZE)


solid = Compound([f1.part, f11.part, f21.part, f26.part])
